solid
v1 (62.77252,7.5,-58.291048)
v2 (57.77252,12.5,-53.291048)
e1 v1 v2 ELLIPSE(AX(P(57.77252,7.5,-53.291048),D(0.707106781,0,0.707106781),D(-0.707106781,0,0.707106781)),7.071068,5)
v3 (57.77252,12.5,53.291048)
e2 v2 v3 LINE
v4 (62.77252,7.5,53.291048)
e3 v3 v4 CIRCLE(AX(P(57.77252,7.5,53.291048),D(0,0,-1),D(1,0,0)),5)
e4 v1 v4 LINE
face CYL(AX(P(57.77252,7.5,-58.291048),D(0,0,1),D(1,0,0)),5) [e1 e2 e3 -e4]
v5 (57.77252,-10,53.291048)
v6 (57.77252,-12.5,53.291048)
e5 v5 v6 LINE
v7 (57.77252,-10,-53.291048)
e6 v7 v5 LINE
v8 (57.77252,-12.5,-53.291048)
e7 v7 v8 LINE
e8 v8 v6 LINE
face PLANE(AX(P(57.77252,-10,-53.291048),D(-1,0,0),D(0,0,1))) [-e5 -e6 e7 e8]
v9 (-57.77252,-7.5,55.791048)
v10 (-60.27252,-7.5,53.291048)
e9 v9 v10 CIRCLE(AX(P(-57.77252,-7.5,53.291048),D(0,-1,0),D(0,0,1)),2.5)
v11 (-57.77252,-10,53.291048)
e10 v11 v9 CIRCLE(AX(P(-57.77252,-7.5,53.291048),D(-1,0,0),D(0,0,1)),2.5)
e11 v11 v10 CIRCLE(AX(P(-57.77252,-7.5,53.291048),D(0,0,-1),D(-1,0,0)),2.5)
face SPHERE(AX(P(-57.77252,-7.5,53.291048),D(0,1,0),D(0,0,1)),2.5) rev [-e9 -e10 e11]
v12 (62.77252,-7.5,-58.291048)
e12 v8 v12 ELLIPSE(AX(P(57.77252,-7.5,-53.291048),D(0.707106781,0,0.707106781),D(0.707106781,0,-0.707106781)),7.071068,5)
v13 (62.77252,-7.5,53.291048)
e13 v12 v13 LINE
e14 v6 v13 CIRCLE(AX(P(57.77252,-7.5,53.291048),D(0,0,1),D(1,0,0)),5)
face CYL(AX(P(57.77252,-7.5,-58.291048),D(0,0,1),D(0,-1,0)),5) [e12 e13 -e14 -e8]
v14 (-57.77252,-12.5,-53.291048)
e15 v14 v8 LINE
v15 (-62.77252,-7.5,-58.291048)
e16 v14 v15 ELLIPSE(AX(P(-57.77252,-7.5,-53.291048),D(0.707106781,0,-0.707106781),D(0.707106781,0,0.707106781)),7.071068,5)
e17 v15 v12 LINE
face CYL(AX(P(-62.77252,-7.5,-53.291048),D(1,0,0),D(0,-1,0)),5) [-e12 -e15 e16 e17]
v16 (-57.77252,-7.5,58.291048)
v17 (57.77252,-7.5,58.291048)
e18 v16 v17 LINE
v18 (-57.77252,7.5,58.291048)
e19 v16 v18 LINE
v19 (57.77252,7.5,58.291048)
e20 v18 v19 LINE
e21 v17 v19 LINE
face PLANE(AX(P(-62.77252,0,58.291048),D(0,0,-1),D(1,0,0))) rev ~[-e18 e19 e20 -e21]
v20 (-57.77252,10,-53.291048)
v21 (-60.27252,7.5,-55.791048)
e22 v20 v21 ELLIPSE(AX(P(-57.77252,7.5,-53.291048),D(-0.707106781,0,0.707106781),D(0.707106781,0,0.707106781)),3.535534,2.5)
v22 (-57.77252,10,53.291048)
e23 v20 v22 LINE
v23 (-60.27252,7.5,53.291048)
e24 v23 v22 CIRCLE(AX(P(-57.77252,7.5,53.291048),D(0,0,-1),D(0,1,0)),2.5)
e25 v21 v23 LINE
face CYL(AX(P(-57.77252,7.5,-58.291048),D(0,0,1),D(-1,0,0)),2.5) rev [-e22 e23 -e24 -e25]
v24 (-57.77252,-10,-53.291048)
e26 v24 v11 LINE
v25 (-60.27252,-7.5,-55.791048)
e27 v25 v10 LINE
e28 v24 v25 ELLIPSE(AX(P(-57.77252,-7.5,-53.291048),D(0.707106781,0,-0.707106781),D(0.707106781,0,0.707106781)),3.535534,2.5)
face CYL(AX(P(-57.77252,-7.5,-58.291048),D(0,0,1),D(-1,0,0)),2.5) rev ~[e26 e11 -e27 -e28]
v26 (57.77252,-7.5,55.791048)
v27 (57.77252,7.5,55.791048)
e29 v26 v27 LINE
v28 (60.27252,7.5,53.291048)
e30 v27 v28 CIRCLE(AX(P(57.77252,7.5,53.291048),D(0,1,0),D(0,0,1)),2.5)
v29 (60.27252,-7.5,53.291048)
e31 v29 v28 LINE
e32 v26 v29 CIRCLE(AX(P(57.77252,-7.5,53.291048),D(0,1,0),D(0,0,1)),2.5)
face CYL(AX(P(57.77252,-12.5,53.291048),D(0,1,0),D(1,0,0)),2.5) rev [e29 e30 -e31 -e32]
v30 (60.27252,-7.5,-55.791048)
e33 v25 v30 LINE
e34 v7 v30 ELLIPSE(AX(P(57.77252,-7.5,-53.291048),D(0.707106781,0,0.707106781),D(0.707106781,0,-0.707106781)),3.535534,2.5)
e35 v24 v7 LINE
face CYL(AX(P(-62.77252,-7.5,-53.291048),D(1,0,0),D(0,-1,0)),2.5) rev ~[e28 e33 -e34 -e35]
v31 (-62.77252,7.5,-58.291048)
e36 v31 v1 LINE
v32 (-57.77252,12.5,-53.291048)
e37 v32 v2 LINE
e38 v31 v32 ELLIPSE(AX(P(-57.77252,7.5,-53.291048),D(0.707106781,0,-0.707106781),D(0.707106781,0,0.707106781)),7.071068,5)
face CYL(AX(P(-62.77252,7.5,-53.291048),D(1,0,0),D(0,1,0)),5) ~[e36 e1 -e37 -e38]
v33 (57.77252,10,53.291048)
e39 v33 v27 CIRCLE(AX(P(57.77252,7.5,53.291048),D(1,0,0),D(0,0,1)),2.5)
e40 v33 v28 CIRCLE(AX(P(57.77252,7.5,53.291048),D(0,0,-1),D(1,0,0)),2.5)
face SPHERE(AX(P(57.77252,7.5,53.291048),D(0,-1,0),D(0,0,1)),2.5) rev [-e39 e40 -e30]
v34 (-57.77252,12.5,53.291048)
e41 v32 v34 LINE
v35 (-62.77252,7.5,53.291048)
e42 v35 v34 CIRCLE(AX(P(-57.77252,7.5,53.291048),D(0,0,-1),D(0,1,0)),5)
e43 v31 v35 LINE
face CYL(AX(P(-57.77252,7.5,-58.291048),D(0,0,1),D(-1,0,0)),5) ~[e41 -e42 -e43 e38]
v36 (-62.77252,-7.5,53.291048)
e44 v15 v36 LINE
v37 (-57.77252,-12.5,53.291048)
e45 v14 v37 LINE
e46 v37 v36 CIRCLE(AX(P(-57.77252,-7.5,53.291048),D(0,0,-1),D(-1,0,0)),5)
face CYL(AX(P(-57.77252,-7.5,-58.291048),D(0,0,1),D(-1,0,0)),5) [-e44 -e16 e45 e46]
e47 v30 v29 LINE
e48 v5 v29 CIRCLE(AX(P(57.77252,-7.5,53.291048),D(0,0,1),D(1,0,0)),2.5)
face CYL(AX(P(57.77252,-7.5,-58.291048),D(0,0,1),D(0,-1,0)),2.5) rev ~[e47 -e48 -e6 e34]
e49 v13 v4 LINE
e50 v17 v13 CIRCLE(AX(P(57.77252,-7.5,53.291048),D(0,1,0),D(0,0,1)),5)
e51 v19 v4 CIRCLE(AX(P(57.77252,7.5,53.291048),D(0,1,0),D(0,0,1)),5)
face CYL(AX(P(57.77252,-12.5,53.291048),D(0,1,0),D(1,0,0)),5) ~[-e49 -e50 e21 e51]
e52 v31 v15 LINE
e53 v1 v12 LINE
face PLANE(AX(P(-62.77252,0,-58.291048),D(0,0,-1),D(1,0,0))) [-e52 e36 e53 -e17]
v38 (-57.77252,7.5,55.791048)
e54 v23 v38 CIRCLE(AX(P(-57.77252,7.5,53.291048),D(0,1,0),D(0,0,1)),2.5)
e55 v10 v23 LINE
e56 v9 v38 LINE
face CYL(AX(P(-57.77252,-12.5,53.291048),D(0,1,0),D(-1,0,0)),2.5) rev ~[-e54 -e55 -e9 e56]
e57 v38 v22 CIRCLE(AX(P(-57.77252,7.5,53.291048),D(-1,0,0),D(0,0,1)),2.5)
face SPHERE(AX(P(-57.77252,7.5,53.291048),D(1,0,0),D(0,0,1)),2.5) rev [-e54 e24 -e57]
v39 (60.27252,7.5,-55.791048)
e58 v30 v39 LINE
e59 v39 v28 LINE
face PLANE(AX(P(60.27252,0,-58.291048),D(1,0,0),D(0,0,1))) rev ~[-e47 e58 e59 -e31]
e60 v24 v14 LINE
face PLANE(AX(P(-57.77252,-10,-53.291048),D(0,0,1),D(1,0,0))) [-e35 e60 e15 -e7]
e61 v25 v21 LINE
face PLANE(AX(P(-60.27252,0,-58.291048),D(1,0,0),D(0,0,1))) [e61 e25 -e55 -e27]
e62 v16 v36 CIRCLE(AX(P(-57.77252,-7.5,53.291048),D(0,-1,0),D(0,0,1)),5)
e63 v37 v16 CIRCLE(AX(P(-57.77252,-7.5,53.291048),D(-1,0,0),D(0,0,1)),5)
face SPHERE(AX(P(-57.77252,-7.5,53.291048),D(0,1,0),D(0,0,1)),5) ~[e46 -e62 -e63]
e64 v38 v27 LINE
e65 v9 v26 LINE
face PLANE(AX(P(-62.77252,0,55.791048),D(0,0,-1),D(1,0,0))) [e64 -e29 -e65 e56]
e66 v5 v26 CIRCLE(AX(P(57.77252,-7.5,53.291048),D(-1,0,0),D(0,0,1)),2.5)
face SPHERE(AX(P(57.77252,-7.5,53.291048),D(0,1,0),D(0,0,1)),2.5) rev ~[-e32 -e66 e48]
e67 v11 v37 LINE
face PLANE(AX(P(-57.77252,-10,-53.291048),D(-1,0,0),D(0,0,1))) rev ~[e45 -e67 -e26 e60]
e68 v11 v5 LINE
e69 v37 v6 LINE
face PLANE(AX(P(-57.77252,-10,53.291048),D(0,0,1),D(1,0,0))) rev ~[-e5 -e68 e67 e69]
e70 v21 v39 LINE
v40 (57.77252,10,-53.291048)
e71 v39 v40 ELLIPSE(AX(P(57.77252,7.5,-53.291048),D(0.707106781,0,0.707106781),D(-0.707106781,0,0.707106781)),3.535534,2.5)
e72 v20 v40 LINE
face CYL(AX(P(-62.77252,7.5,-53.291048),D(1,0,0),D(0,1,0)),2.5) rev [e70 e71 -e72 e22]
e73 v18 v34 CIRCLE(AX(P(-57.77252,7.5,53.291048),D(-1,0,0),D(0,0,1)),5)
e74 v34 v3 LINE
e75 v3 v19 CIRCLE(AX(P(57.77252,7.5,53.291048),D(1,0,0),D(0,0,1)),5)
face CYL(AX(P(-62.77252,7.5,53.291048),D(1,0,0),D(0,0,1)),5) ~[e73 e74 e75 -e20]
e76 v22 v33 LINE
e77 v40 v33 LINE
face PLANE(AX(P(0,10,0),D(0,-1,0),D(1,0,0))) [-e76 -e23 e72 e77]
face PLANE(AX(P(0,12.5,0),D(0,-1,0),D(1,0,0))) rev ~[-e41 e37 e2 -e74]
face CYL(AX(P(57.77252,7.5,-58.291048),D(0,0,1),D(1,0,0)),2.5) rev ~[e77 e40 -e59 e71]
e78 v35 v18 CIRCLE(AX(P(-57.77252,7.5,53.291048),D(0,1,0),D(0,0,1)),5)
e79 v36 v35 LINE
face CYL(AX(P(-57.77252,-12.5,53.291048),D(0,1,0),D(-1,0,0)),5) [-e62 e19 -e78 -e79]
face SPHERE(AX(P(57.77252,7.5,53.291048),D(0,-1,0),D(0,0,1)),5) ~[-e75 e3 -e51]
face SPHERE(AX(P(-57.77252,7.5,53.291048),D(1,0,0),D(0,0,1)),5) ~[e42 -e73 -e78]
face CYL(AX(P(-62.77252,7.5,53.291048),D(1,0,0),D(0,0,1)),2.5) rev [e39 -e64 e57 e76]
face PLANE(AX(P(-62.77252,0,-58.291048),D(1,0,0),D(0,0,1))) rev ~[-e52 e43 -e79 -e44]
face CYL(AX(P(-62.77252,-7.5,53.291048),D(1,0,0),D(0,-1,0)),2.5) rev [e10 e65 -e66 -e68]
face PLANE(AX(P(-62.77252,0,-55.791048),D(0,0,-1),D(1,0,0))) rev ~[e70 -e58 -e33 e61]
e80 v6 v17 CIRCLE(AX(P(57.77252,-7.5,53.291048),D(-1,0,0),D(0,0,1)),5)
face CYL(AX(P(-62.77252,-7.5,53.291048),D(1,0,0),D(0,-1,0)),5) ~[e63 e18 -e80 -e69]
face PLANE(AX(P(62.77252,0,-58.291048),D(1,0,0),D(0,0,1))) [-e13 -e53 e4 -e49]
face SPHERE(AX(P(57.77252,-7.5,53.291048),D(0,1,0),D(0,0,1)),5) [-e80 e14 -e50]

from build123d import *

# Parameters (mm, degrees)
F0_W     = 125.545039773
F0_H     = 116.582095623
F1_DEPTH = 12.5
F2_R     = 5
F3_T     = -2.5


# Not quite as in the source:
# - a shell that OpenCascade refuses in one call is made with other operations: the cavity is built on its own and cut out


with BuildPart() as f1:
    # F0 (on Front) → F1 (new body, symmetric)
    with BuildSketch(Plane.XZ):
        Rectangle(F0_W, F0_H)
    extrude(amount=F1_DEPTH, both=True)

    # F2
    f2_edges = [f1.edges().sort_by_distance(p)[0] for p in [
        (62.77252, 0, 58.291048),
        (0, 12.5, 58.291048),
        (-62.77252, 0, 58.291048),
        (0, -12.5, 58.291048),
        (62.77252, 12.5, 0),
        (0, -12.5, -58.291048),
        (62.77252, -12.5, 0),
        (-62.77252, -12.5, 0),
        (-62.77252, 12.5, 0),
        (0, 12.5, -58.291048),
    ]]
    fillet(f2_edges, radius=F2_R)

    # F3: a shell. OpenCascade refuses it in one call, so the cavity is built on its own and cut out:
    # the body offset inwards by the wall thickness, plus a prism from it out through each open face.
    f3_core = offset(f1.part, amount=F3_T, mode=Mode.PRIVATE)
    f3_exits = [f3_core.faces().sort_by_distance(p)[0] for p in [
        (0, -10, 0),
    ]]
    add(f3_core, mode=Mode.SUBTRACT)
    extrude(f3_exits, amount=-F3_T, mode=Mode.SUBTRACT)


solid = f1.part
